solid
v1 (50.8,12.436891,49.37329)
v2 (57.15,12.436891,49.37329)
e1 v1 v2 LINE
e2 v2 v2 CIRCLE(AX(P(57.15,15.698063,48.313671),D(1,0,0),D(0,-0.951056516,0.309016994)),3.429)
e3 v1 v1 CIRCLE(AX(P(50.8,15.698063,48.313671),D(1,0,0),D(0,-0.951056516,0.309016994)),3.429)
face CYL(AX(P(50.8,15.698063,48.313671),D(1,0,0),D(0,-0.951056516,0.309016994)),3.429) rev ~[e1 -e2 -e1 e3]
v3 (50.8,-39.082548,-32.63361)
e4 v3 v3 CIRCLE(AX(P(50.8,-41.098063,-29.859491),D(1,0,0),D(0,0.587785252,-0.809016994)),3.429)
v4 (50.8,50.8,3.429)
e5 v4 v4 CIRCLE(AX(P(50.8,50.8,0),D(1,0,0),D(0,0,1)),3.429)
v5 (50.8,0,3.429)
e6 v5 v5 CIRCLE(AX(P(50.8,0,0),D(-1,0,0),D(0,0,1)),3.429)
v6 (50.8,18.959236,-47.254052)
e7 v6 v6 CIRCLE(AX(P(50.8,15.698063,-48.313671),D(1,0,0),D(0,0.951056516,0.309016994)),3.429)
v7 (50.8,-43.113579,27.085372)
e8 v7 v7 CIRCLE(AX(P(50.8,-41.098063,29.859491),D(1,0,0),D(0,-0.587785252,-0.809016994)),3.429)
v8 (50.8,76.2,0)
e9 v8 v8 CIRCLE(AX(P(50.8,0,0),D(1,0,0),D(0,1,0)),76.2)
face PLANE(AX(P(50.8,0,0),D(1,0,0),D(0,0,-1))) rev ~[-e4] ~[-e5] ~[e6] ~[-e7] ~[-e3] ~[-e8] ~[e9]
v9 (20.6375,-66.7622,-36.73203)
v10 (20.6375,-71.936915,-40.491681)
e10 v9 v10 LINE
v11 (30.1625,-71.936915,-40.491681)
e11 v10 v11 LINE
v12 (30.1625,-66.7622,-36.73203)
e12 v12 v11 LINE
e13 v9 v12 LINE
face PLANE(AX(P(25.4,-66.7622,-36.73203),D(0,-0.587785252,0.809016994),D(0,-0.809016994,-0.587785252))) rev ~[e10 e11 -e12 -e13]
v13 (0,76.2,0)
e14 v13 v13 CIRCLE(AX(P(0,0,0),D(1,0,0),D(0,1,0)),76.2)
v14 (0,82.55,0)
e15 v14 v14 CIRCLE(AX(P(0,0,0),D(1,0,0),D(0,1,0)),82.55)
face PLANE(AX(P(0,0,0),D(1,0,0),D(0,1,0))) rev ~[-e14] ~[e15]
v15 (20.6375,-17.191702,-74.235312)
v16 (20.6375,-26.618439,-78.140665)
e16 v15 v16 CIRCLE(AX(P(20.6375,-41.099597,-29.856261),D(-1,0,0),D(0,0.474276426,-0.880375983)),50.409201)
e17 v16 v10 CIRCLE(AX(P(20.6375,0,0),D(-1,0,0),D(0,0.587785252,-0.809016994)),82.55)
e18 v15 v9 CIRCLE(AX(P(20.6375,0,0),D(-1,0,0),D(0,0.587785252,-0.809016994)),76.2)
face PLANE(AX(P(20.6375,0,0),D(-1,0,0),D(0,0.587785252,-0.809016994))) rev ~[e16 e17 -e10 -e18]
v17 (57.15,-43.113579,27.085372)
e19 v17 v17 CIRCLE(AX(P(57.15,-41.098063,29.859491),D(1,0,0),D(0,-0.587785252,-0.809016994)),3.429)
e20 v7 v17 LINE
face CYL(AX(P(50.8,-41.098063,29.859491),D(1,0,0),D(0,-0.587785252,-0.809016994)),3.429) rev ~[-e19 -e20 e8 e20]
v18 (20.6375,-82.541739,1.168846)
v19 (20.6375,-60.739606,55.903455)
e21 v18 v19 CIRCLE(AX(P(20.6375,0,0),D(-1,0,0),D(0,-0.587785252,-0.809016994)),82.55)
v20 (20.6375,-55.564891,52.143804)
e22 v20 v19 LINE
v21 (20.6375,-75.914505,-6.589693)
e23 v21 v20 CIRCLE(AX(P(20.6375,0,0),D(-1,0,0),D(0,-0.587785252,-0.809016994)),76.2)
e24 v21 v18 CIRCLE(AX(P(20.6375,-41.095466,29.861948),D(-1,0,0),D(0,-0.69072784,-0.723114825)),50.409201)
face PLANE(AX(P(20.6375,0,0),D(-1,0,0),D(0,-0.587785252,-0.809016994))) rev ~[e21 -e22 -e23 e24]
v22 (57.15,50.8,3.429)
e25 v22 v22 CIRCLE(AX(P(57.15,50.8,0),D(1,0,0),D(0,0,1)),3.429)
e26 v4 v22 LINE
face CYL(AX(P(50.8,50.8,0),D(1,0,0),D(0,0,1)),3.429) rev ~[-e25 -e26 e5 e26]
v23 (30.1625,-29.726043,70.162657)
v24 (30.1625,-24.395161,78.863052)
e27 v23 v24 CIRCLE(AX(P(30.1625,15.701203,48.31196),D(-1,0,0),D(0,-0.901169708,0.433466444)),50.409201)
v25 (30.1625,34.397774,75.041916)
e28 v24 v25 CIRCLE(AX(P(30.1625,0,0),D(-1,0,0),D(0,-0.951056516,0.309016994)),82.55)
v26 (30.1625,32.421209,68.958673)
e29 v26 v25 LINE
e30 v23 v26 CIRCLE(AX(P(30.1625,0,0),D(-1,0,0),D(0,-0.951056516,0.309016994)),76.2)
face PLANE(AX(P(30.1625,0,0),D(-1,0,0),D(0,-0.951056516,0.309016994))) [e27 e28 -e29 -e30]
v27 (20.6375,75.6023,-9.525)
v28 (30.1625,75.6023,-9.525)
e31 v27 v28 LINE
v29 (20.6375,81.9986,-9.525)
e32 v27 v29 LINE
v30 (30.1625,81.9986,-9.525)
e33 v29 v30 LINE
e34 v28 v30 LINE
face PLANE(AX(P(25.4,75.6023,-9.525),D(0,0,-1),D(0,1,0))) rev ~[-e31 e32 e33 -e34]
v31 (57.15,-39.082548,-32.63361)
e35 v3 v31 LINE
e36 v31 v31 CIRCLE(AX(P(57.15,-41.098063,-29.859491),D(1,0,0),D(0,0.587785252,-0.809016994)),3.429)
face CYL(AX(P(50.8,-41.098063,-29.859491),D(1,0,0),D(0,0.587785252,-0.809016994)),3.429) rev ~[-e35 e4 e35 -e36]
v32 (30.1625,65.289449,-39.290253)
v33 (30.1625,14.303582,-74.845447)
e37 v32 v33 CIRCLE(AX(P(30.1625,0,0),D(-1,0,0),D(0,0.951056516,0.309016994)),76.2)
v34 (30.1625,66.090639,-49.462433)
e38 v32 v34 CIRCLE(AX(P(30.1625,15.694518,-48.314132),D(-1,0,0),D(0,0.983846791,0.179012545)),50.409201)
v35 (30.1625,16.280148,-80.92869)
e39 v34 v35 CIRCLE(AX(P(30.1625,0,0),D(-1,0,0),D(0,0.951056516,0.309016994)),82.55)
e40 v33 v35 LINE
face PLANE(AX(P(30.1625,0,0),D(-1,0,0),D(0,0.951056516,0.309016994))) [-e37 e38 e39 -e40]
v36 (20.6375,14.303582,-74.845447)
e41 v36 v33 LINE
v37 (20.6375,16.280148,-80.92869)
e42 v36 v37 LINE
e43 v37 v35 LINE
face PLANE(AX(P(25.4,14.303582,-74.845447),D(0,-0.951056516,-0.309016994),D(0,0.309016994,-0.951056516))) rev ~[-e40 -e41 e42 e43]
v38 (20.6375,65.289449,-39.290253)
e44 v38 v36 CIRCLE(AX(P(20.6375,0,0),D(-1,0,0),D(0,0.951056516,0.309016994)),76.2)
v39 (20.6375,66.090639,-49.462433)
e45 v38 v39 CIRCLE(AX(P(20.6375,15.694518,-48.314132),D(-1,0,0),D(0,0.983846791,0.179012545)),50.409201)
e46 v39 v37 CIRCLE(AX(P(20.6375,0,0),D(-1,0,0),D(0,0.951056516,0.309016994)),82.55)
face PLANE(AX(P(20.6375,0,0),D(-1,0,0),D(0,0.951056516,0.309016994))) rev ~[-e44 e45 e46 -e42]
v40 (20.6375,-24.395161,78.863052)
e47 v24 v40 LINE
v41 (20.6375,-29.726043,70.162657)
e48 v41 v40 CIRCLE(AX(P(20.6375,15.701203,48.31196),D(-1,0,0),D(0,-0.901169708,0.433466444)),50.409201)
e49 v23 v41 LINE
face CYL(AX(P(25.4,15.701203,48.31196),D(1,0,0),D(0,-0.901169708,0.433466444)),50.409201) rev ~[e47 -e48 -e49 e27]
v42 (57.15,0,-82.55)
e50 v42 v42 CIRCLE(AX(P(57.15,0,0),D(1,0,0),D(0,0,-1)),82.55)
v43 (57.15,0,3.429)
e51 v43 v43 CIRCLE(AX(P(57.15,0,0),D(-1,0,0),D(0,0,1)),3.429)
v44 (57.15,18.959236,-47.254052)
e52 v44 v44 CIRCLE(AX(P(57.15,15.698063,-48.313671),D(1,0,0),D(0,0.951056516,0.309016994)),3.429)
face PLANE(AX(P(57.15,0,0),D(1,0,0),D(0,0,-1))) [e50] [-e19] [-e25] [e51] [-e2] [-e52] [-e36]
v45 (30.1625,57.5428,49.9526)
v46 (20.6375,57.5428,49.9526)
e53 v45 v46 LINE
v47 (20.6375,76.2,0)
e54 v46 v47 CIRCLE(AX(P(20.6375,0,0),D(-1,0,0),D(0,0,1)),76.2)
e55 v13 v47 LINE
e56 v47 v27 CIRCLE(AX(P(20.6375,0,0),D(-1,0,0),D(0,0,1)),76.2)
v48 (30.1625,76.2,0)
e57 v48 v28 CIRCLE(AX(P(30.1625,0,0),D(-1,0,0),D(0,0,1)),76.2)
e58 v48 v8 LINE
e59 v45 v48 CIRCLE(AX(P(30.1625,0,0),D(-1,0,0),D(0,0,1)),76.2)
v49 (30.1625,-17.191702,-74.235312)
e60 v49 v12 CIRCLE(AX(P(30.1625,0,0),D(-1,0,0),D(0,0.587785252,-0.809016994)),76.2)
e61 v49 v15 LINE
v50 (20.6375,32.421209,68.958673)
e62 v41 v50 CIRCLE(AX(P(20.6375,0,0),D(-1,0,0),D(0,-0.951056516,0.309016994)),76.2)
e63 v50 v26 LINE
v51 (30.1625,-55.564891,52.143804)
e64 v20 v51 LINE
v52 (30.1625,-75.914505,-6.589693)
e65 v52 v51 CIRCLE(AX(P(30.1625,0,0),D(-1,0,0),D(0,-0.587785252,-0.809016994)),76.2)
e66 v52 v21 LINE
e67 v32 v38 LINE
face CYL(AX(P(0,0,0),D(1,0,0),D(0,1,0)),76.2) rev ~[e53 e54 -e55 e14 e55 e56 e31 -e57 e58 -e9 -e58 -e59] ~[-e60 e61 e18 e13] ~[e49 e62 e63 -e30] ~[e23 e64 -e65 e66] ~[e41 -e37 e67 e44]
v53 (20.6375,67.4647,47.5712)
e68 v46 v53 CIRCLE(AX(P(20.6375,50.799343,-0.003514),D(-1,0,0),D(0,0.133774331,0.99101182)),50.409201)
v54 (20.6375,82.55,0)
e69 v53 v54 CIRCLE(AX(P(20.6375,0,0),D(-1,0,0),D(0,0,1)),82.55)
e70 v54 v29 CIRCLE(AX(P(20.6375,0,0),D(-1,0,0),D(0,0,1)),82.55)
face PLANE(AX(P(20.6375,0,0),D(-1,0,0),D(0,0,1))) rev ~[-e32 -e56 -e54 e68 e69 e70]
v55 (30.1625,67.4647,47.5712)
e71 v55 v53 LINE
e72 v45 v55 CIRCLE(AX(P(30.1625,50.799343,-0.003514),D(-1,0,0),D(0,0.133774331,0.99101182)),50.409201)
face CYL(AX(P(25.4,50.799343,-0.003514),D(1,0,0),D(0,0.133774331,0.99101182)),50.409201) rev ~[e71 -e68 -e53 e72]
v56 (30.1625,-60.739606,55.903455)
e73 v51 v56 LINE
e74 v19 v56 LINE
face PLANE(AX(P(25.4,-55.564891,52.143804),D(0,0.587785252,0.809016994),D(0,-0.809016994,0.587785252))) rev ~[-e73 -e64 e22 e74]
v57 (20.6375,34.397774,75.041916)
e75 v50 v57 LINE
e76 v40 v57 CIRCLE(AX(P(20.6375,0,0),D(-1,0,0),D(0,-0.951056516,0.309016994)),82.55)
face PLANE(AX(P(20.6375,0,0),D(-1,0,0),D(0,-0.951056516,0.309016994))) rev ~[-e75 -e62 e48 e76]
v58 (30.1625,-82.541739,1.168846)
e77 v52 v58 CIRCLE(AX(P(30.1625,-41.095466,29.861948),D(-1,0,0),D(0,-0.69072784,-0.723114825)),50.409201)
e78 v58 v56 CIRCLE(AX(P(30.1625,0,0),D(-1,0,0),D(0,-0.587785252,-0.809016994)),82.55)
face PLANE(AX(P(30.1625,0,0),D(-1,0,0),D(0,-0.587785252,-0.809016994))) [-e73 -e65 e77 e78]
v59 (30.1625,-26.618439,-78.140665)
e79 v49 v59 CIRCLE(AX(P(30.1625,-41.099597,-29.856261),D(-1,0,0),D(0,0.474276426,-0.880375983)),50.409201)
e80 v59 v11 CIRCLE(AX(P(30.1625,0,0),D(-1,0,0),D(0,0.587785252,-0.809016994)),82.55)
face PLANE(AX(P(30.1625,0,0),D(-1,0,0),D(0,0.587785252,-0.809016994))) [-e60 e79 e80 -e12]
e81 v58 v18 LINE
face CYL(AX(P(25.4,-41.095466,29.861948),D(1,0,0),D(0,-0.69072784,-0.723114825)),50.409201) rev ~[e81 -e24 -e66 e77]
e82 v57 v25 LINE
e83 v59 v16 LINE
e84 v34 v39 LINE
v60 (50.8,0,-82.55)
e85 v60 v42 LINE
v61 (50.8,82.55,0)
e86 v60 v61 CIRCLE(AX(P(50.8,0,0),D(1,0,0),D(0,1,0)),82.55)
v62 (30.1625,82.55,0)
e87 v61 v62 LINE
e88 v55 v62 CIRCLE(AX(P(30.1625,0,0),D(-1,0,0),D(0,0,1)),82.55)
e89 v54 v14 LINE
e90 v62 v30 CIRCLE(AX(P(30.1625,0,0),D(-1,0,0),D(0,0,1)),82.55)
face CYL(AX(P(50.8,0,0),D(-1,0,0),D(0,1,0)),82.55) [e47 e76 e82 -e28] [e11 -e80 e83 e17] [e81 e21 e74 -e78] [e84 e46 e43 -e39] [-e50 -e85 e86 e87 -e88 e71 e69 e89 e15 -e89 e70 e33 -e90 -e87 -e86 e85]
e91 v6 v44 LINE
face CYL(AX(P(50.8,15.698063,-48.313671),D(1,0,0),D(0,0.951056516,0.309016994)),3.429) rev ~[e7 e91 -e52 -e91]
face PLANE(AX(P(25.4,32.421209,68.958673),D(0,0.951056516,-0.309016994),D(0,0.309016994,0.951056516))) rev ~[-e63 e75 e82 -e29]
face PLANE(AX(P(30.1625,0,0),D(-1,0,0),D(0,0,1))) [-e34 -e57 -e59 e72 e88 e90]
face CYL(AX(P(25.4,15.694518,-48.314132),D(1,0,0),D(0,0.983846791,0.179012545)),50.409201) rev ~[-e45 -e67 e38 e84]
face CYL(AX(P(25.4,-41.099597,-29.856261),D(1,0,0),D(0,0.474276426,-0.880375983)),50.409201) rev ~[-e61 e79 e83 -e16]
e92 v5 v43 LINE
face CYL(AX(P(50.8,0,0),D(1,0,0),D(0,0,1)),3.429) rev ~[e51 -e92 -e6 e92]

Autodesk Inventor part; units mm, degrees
ref_plane "YZ Plane" through (0, 0, 0) normal (1, 0, 0) x (0, 1, 0)
ref_plane "XZ Plane" through (0, 0, 0) normal (0, 1, 0) x (-1, 0, 0)
sketch "Sketch1" plane through (0, 0, 0) normal (0, 0, 1) x (1, 0, 0)
  line L0 (0, 0) -> (50.8, 0) construction
  line L1 (0, 82.55) -> (0, 76.2)
  line L2 (0, 76.2) -> (50.8, 76.2)
  line L3 (50.8, 76.2) -> (50.8, 82.55)
  line L4 (50.8, 82.55) -> (0, 82.55)
  dimension "d1" = 50.8
  dimension "d7" = 76.2
  dimension "d8" = 6.35
revolve "Revolution1" add sketch "Sketch1" angle 360 about axis through (0, 0, 0) along (1, 0, 0)
sketch "Sketch2" plane through (50.8, 0, 0) normal (1, 0, 0) x (0, 0, -1)
  circle A0 centre (0, 0) radius 82.55 projected
  circle A1 centre (0, 0) radius 76.2 projected
extrude "Extrusion1" add sketch "Sketch2" along normal blind 6.35 contours A0 | A1
sketch "Sketch3" plane through (50.8, 0, 0) normal (-1, 0, 0) x (0, 0, 1)
  point P0 (0, 0)
  point P1 (0, 50.8)
  point P2 (0, 0)
  dimension "d9" = 50.8
hole "Hole1" at (50.8, 50.8, 0) at (50.8, 0, 0) direction (1, 0, 0) diameter 6.858 end through all
pattern_circular "Circular Pattern1" count 5 over 360 about axis through (25.4, 0, 0) along (1, 0, 0) of "Hole1"
ref_plane "Work Plane1" through (25.4, 0, 0) normal (-1, 0, 0) x (0, 0, 1)
sketch "Sketch5" plane through (25.4, 0, 0) normal (-1, 0, 0) x (0, 0, 1)
  circle A0 centre (0, 0) radius 76.2 projected
  circle A1 centre (0, 0) radius 82.55 projected
  circle A2 centre (48.3137, 15.6981) radius 3.429 projected
  circle A3 centre (29.8595, -41.0981) radius 3.429 projected
  circle A4 centre (0, 50.8) radius 3.429 construction
  circle A5 centre (0, 0) radius 3.429 projected
  circle A6 centre (0, 0) radius 76.2 projected
  circle A7 centre (0, 50.8) radius 3.429 construction
  circle A8 centre (0, 50.8) radius 9.525 construction
  line L0 (0, 60.325) -> (49.1356, 60.325) construction
  line L1 (49.1356, 60.325) -> (49.1356, 41.275) construction
  line L2 (49.1356, 41.275) -> (0, 41.275) construction
  line L3 (0, 41.275) -> (0, 60.325) construction
  circle A9 centre (0, 50.8) radius 50.4056 construction
  circle A10 centre (0, 0) radius 76.2 projected
  arc A11 (49.9526, 57.5428) -> (47.5712, 67.4647) centre (0, 50.8) ccw
  line L4 (-9.525, 50.8) -> (-9.525, 81.9986) construction
  circle A12 centre (0, 0) radius 76.2 projected
  line L5 (-9.525, 75.6023) -> (-9.525, 81.9986)
  arc A13 (49.9526, 57.5428) -> (-9.525, 75.6023) centre (0, 0) ccw
  arc A14 (47.5712, 67.4647) -> (-9.525, 81.9986) centre (0, 0) ccw
  point P0 (49.9526, 57.5428)
  dimension "d27" = 19.05
  dimension "d28" = 19.05
  dimension "d29" = 49.1356
  dimension "d30" = 100.8113
  dimension "d31" = 82.55
extrude "Extrusion2" cut sketch "Sketch5" along normal mid plane 9.525 contours A0 L5 A1 A11 picked at (-1.9672, 80.2341)
pattern_circular "Circular Pattern2" count 5 over 360 about axis through (291.1792, 0, 0) along (-1, 0, 0) of "Extrusion2"
equation "\"d1\" = wheelDepth"
equation "\"d7\" = wheelR"
equation "\"d8\" = wheelThickness"
equation "\"d9\" = farFromCenter"
equation "\"d10\" = smallHoles"
equation "\"d27\" = swivelBaseDiameter"
equation "\"d28\" = d27"
equation "\"d29\" = swivelLegLength"
equation "\"d31\" = wheelR + wheelThickness"
equation "\"d32\" = 0.5 * swivelLegThickness"
equation "\"gearShaft\" = 6.35"
equation "\"largeGear\" = 38.1"
equation "\"smallGear\" = 12.7"
equation "\"wheelR\" = 76.2"
equation "\"wheelThickness\" = 6.35"
equation "\"wheelDepth\" = 50.8"
equation "\"mainHole\" = 6.858"
equation "\"smallHoles\" = 6.858"
equation "\"farFromCenter\" = 50.8"
equation "\"smallGearLength\" = 50.8"
equation "\"mainGearLength\" = 76.2"
equation "\"gearThickness\" = 6.35"
equation "\"mainGear\" = 38.1"
equation "\"d20\" = -0.5 * wheelDepth"
equation "\"swivelBaseDiameter\" = 19.05"
equation "\"swivelLegExtentions\" = 19.05"
equation "\"swivelLegLength\" = 49.13565"
equation "\"swivelLegThickness\" = 19.05"
properties part number "Wheel1"
